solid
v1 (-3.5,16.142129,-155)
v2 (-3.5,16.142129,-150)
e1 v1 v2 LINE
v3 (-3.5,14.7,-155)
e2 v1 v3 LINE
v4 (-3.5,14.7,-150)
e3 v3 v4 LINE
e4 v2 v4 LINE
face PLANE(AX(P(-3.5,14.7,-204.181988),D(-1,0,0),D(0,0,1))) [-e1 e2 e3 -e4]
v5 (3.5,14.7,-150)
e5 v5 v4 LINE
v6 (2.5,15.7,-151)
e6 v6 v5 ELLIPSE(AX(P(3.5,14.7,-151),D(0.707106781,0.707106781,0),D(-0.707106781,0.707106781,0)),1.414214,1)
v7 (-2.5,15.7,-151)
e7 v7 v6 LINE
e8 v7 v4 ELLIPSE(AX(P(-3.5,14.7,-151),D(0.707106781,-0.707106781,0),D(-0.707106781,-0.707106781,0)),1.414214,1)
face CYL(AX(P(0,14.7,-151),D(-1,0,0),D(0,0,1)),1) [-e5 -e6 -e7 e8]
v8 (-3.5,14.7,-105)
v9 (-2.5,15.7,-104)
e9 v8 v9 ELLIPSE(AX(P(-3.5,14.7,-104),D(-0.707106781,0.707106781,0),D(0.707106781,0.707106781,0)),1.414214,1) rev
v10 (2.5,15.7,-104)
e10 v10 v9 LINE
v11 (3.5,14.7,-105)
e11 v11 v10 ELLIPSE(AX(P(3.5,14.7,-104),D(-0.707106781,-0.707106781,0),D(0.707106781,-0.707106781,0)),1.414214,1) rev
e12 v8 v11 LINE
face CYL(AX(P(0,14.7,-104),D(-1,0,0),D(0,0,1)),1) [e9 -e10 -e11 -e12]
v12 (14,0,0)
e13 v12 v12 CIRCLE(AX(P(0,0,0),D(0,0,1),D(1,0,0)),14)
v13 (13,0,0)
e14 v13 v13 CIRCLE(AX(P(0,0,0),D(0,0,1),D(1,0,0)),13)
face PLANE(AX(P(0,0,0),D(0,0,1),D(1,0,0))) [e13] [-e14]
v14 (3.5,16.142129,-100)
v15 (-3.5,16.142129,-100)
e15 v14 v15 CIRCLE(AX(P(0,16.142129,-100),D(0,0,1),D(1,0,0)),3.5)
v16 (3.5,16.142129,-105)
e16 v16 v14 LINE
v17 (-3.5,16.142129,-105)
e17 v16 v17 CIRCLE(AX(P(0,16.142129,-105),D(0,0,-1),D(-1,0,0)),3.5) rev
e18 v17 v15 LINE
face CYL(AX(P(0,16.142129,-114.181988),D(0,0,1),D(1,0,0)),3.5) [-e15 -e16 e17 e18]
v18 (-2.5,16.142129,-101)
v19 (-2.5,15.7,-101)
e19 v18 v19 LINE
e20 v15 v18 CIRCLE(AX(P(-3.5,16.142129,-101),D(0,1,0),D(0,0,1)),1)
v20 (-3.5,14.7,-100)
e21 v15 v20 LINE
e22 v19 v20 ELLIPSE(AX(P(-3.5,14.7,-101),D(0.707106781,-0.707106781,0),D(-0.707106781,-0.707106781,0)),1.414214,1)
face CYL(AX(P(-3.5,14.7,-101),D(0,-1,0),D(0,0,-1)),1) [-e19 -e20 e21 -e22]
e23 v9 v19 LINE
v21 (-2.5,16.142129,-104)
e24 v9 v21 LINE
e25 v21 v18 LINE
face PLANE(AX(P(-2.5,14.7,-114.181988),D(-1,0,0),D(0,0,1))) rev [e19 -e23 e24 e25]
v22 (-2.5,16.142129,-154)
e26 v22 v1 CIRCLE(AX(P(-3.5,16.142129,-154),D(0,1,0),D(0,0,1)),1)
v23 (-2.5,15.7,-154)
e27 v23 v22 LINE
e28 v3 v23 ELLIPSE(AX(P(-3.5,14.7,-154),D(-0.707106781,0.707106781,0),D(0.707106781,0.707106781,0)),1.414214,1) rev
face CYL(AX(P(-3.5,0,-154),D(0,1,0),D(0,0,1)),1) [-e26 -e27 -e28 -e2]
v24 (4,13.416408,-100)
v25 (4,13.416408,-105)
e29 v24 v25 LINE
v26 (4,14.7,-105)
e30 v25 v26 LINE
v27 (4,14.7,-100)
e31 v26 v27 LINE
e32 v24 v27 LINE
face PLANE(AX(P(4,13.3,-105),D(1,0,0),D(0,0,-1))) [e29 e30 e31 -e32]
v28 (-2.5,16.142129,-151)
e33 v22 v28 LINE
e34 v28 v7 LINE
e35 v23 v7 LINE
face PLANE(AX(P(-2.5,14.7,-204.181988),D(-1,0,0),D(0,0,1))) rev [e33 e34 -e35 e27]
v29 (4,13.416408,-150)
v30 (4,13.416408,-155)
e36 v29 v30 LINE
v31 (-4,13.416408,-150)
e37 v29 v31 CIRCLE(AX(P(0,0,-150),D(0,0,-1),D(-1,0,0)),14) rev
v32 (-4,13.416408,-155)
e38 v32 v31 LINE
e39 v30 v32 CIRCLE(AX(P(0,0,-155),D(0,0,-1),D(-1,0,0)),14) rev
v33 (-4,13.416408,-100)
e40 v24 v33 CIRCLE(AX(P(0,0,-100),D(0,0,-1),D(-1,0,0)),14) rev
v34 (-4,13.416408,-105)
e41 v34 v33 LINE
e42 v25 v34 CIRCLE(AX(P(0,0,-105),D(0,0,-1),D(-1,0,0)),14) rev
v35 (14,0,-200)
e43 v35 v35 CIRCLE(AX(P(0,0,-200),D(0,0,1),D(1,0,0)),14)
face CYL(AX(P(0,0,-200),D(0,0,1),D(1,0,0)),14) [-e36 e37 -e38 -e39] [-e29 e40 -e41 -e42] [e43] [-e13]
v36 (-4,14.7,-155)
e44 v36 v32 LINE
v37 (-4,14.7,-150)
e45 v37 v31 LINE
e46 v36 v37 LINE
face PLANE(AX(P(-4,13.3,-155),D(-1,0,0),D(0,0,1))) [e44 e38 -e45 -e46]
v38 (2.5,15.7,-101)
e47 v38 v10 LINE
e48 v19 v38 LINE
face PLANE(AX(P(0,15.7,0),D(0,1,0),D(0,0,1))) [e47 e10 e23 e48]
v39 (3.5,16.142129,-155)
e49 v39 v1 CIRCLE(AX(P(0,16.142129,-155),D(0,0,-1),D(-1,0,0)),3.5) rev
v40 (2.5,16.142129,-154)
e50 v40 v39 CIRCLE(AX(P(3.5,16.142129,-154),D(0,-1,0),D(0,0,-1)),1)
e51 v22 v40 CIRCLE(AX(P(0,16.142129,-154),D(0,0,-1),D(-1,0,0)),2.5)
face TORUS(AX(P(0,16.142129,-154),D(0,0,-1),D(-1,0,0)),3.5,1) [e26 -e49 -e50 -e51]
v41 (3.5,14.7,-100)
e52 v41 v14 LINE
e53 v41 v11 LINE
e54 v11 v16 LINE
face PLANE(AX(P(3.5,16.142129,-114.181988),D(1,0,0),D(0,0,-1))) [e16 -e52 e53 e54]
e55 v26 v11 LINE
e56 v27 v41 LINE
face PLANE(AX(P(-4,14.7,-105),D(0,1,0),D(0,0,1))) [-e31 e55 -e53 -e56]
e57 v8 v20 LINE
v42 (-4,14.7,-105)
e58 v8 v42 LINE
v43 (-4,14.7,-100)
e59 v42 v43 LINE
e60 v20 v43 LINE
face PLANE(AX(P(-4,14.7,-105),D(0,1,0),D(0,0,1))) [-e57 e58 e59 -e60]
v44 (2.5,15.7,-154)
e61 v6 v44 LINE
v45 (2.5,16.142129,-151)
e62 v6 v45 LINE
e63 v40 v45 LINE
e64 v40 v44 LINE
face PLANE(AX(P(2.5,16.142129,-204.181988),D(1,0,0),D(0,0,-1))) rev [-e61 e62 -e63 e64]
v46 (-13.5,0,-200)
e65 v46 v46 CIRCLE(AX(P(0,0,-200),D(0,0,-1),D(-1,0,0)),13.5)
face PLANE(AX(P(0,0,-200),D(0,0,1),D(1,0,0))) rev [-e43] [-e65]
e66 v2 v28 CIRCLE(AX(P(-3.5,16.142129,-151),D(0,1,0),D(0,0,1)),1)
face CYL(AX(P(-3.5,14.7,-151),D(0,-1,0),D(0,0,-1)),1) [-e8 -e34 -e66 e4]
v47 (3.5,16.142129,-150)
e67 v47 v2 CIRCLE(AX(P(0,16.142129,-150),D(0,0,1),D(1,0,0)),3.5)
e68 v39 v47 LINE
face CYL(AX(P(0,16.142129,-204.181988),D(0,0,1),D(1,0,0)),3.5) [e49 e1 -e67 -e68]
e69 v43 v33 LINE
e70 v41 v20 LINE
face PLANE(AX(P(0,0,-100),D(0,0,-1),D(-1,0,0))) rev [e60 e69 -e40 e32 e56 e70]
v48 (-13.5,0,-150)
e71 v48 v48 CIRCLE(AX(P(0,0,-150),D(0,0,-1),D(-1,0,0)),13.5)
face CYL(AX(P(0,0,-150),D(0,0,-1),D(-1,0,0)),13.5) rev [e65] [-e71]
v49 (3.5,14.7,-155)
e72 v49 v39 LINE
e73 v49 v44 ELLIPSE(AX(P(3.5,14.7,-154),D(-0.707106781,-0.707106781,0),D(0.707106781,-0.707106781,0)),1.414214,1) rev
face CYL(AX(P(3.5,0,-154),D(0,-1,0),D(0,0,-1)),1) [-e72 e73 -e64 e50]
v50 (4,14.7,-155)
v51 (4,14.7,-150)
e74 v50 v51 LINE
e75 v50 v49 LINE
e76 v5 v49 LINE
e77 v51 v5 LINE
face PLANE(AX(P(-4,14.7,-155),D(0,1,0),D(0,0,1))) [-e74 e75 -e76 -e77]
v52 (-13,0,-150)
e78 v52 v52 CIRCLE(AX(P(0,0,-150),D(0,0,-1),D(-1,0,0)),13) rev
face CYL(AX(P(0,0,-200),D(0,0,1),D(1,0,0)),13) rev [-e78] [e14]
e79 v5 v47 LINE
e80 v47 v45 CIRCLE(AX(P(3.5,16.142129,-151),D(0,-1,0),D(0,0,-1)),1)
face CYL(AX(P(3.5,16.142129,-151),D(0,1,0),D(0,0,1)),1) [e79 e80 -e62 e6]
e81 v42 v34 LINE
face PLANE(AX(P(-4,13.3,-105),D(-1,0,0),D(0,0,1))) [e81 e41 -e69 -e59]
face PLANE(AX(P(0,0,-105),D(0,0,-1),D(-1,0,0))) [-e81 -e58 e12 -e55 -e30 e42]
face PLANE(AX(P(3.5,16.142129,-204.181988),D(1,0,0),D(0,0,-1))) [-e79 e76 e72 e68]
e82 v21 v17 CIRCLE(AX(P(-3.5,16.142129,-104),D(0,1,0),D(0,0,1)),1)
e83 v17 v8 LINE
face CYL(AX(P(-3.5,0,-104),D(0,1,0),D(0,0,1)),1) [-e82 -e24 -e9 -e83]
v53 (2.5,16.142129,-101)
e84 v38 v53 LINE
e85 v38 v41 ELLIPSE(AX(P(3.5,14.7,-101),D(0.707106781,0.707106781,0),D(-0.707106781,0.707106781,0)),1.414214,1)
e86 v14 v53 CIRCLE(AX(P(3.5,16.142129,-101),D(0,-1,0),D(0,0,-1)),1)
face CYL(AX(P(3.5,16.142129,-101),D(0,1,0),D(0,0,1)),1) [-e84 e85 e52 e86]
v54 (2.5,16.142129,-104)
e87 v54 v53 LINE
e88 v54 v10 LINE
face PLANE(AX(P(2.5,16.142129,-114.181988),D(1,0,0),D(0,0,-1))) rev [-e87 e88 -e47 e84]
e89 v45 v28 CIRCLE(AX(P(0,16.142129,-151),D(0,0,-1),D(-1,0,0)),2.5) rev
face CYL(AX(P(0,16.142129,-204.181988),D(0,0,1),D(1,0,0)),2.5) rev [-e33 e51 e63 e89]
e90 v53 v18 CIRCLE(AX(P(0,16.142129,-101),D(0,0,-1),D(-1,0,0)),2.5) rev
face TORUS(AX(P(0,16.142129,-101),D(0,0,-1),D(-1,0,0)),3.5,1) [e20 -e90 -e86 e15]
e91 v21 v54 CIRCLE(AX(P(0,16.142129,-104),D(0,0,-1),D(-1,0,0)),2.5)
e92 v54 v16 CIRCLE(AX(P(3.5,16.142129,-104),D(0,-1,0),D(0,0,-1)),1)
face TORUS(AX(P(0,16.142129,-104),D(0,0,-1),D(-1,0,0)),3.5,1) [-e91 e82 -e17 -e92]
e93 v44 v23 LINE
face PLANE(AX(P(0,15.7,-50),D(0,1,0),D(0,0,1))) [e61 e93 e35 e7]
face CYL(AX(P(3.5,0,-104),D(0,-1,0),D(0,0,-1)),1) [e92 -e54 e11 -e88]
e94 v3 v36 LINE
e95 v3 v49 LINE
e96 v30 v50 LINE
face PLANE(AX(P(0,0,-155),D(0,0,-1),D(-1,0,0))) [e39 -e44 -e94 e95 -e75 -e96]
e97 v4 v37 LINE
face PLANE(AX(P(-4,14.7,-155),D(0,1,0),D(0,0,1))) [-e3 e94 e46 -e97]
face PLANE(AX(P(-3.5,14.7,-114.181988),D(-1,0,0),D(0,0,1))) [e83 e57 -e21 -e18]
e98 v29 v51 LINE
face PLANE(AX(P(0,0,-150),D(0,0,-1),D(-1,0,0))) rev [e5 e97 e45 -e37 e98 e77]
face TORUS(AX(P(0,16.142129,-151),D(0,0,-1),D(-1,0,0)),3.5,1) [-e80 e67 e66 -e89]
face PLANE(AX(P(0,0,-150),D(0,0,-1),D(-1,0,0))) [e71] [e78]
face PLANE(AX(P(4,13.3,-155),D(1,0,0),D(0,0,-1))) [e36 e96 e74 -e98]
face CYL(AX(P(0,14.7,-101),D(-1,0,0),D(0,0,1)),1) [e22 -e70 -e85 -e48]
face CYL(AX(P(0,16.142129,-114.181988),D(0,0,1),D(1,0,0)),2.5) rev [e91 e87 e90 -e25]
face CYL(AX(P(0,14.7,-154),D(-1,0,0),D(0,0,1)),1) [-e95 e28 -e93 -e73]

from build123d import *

# Parameters (mm, degrees)
CROQUIS1_R                 = 14
SALIENTE_EXTRUIR1_DEPTH    = 200
CORTAR_EXTRUIR1_DEPTH      = 201.977610693
CORTAR_EXTRUIR1_DEPTH_BACK = 201.977610693
CROQUIS2_R                 = 13
CROQUIS3_W                 = 8
CROQUIS3_H                 = 1.4
SALIENTE_EXTRUIR2_DEPTH    = 5
EXTRUIR_L_MINA2_DEPTH      = 5
CROQUIS6_W                 = 5
CROQUIS6_H                 = 5
SALIENTE_EXTRUIR3_DEPTH    = 1
REDONDEO1_R                = 1
MATRIZL2_COUNT             = 2
MATRIZL2_PITCH             = 50
REDONDEO1_OF_MATRIZL2_R    = 1
CROQUIS8_R                 = 13.5
CORTAR_EXTRUIR2_DEPTH      = 50


with BuildPart() as part:
    # Croquis1 → Saliente-Extruir1 (new body)
    with BuildSketch(Plane.XY):
        Circle(CROQUIS1_R)
    extrude(amount=-SALIENTE_EXTRUIR1_DEPTH)

    # Croquis2 → Cortar-Extruir1 (cut, two sides: drawn at the far end of the back side and taken through both)
    with BuildSketch(Plane.XY.offset(-CORTAR_EXTRUIR1_DEPTH_BACK)):
        Circle(CROQUIS2_R)
    extrude(amount=CORTAR_EXTRUIR1_DEPTH + CORTAR_EXTRUIR1_DEPTH_BACK, mode=Mode.SUBTRACT)

    # Croquis3 → Saliente-Extruir2 (add)
    with BuildSketch(Plane.XY.offset(-100)):
        with Locations((0, 14)):
            Rectangle(CROQUIS3_W, CROQUIS3_H)
    saliente_extruir2 = extrude(amount=-SALIENTE_EXTRUIR2_DEPTH)

    # Croquis5 → Extruir-Lámina2 (add)
    with BuildSketch(Plane.XY.offset(-100)):
        with BuildLine():
            Line((-3.5, 16.142129337), (-3.5, 15.7))
            Line((-3.5, 15.7), (-3.5, 13.7))
            Line((-3.5, 13.7), (3.5, 13.7))
            Line((3.5, 13.7), (3.5, 16.142129337))
            ThreePointArc((3.5, 16.142129337), (0, 19.642129337), (-3.5, 16.142129337))
        make_face()
        with BuildLine():
            Line((-2.5, 16.142129337), (-2.5, 15.7))
            Line((-2.5, 15.7), (-2.5, 14.7))
            Line((-2.5, 14.7), (2.5, 14.7))
            Line((2.5, 14.7), (2.5, 16.142129337))
            ThreePointArc((2.5, 16.142129337), (0, 18.642129337), (-2.5, 16.142129337))
        make_face(mode=Mode.SUBTRACT)
    extruir_l_mina2 = extrude(amount=-EXTRUIR_L_MINA2_DEPTH)

    # Croquis6 → Saliente-Extruir3 (add)
    with BuildSketch(Plane(origin=(0, 14.7, 0), x_dir=(1, 0, 0), z_dir=(0, 1, 0))):
        with Locations((0, 102.5)):
            Rectangle(CROQUIS6_W, CROQUIS6_H)
    saliente_extruir3 = extrude(amount=SALIENTE_EXTRUIR3_DEPTH)

    # Redondeo1
    redondeo1_edges = [part.edges().sort_by_distance(p)[0] for p in [
        (-2.5, 15.921064668, -100),
        (0, 18.642129337, -100),
        (0, 18.642129337, -105),
        (-2.5, 15.921064668, -105),
        (2.5, 15.921064668, -105),
        (2.5, 15.921064668, -100),
        (0, 15.7, -105),
        (0, 15.7, -100),
    ]]
    fillet(redondeo1_edges, radius=REDONDEO1_R - 0.0001)  # a hair under: the kernel refuses the full size

    # MatrizL2: Saliente-Extruir2, Extruir-Lámina2, Saliente-Extruir3 ×2
    with Locations(*[(0, 0, -i * MATRIZL2_PITCH) for i in range(1, MATRIZL2_COUNT)]):
        add(saliente_extruir2)
        add(extruir_l_mina2)
        add(saliente_extruir3)

    # Redondeo1 of MatrizL2
    redondeo1_of_matrizl2_edges = [part.edges().sort_by_distance(p)[0] for p in [
        (-2.5, 15.921064668, -150),
        (0, 18.642129337, -150),
        (0, 18.642129337, -155),
        (-2.5, 15.921064668, -155),
        (2.5, 15.921064668, -155),
        (2.5, 15.921064668, -150),
        (0, 15.7, -155),
        (0, 15.7, -150),
    ]]
    fillet(redondeo1_of_matrizl2_edges, radius=REDONDEO1_OF_MATRIZL2_R - 0.0001)  # a hair under: the kernel refuses the full size

    # Croquis8 → Cortar-Extruir2 (cut)
    with BuildSketch(Plane(origin=(0, 0, -200), x_dir=(-1, 0, 0), z_dir=(0, 0, -1))):
        Circle(CROQUIS8_R)
    extrude(amount=-CORTAR_EXTRUIR2_DEPTH, mode=Mode.SUBTRACT)


solid = part.part
